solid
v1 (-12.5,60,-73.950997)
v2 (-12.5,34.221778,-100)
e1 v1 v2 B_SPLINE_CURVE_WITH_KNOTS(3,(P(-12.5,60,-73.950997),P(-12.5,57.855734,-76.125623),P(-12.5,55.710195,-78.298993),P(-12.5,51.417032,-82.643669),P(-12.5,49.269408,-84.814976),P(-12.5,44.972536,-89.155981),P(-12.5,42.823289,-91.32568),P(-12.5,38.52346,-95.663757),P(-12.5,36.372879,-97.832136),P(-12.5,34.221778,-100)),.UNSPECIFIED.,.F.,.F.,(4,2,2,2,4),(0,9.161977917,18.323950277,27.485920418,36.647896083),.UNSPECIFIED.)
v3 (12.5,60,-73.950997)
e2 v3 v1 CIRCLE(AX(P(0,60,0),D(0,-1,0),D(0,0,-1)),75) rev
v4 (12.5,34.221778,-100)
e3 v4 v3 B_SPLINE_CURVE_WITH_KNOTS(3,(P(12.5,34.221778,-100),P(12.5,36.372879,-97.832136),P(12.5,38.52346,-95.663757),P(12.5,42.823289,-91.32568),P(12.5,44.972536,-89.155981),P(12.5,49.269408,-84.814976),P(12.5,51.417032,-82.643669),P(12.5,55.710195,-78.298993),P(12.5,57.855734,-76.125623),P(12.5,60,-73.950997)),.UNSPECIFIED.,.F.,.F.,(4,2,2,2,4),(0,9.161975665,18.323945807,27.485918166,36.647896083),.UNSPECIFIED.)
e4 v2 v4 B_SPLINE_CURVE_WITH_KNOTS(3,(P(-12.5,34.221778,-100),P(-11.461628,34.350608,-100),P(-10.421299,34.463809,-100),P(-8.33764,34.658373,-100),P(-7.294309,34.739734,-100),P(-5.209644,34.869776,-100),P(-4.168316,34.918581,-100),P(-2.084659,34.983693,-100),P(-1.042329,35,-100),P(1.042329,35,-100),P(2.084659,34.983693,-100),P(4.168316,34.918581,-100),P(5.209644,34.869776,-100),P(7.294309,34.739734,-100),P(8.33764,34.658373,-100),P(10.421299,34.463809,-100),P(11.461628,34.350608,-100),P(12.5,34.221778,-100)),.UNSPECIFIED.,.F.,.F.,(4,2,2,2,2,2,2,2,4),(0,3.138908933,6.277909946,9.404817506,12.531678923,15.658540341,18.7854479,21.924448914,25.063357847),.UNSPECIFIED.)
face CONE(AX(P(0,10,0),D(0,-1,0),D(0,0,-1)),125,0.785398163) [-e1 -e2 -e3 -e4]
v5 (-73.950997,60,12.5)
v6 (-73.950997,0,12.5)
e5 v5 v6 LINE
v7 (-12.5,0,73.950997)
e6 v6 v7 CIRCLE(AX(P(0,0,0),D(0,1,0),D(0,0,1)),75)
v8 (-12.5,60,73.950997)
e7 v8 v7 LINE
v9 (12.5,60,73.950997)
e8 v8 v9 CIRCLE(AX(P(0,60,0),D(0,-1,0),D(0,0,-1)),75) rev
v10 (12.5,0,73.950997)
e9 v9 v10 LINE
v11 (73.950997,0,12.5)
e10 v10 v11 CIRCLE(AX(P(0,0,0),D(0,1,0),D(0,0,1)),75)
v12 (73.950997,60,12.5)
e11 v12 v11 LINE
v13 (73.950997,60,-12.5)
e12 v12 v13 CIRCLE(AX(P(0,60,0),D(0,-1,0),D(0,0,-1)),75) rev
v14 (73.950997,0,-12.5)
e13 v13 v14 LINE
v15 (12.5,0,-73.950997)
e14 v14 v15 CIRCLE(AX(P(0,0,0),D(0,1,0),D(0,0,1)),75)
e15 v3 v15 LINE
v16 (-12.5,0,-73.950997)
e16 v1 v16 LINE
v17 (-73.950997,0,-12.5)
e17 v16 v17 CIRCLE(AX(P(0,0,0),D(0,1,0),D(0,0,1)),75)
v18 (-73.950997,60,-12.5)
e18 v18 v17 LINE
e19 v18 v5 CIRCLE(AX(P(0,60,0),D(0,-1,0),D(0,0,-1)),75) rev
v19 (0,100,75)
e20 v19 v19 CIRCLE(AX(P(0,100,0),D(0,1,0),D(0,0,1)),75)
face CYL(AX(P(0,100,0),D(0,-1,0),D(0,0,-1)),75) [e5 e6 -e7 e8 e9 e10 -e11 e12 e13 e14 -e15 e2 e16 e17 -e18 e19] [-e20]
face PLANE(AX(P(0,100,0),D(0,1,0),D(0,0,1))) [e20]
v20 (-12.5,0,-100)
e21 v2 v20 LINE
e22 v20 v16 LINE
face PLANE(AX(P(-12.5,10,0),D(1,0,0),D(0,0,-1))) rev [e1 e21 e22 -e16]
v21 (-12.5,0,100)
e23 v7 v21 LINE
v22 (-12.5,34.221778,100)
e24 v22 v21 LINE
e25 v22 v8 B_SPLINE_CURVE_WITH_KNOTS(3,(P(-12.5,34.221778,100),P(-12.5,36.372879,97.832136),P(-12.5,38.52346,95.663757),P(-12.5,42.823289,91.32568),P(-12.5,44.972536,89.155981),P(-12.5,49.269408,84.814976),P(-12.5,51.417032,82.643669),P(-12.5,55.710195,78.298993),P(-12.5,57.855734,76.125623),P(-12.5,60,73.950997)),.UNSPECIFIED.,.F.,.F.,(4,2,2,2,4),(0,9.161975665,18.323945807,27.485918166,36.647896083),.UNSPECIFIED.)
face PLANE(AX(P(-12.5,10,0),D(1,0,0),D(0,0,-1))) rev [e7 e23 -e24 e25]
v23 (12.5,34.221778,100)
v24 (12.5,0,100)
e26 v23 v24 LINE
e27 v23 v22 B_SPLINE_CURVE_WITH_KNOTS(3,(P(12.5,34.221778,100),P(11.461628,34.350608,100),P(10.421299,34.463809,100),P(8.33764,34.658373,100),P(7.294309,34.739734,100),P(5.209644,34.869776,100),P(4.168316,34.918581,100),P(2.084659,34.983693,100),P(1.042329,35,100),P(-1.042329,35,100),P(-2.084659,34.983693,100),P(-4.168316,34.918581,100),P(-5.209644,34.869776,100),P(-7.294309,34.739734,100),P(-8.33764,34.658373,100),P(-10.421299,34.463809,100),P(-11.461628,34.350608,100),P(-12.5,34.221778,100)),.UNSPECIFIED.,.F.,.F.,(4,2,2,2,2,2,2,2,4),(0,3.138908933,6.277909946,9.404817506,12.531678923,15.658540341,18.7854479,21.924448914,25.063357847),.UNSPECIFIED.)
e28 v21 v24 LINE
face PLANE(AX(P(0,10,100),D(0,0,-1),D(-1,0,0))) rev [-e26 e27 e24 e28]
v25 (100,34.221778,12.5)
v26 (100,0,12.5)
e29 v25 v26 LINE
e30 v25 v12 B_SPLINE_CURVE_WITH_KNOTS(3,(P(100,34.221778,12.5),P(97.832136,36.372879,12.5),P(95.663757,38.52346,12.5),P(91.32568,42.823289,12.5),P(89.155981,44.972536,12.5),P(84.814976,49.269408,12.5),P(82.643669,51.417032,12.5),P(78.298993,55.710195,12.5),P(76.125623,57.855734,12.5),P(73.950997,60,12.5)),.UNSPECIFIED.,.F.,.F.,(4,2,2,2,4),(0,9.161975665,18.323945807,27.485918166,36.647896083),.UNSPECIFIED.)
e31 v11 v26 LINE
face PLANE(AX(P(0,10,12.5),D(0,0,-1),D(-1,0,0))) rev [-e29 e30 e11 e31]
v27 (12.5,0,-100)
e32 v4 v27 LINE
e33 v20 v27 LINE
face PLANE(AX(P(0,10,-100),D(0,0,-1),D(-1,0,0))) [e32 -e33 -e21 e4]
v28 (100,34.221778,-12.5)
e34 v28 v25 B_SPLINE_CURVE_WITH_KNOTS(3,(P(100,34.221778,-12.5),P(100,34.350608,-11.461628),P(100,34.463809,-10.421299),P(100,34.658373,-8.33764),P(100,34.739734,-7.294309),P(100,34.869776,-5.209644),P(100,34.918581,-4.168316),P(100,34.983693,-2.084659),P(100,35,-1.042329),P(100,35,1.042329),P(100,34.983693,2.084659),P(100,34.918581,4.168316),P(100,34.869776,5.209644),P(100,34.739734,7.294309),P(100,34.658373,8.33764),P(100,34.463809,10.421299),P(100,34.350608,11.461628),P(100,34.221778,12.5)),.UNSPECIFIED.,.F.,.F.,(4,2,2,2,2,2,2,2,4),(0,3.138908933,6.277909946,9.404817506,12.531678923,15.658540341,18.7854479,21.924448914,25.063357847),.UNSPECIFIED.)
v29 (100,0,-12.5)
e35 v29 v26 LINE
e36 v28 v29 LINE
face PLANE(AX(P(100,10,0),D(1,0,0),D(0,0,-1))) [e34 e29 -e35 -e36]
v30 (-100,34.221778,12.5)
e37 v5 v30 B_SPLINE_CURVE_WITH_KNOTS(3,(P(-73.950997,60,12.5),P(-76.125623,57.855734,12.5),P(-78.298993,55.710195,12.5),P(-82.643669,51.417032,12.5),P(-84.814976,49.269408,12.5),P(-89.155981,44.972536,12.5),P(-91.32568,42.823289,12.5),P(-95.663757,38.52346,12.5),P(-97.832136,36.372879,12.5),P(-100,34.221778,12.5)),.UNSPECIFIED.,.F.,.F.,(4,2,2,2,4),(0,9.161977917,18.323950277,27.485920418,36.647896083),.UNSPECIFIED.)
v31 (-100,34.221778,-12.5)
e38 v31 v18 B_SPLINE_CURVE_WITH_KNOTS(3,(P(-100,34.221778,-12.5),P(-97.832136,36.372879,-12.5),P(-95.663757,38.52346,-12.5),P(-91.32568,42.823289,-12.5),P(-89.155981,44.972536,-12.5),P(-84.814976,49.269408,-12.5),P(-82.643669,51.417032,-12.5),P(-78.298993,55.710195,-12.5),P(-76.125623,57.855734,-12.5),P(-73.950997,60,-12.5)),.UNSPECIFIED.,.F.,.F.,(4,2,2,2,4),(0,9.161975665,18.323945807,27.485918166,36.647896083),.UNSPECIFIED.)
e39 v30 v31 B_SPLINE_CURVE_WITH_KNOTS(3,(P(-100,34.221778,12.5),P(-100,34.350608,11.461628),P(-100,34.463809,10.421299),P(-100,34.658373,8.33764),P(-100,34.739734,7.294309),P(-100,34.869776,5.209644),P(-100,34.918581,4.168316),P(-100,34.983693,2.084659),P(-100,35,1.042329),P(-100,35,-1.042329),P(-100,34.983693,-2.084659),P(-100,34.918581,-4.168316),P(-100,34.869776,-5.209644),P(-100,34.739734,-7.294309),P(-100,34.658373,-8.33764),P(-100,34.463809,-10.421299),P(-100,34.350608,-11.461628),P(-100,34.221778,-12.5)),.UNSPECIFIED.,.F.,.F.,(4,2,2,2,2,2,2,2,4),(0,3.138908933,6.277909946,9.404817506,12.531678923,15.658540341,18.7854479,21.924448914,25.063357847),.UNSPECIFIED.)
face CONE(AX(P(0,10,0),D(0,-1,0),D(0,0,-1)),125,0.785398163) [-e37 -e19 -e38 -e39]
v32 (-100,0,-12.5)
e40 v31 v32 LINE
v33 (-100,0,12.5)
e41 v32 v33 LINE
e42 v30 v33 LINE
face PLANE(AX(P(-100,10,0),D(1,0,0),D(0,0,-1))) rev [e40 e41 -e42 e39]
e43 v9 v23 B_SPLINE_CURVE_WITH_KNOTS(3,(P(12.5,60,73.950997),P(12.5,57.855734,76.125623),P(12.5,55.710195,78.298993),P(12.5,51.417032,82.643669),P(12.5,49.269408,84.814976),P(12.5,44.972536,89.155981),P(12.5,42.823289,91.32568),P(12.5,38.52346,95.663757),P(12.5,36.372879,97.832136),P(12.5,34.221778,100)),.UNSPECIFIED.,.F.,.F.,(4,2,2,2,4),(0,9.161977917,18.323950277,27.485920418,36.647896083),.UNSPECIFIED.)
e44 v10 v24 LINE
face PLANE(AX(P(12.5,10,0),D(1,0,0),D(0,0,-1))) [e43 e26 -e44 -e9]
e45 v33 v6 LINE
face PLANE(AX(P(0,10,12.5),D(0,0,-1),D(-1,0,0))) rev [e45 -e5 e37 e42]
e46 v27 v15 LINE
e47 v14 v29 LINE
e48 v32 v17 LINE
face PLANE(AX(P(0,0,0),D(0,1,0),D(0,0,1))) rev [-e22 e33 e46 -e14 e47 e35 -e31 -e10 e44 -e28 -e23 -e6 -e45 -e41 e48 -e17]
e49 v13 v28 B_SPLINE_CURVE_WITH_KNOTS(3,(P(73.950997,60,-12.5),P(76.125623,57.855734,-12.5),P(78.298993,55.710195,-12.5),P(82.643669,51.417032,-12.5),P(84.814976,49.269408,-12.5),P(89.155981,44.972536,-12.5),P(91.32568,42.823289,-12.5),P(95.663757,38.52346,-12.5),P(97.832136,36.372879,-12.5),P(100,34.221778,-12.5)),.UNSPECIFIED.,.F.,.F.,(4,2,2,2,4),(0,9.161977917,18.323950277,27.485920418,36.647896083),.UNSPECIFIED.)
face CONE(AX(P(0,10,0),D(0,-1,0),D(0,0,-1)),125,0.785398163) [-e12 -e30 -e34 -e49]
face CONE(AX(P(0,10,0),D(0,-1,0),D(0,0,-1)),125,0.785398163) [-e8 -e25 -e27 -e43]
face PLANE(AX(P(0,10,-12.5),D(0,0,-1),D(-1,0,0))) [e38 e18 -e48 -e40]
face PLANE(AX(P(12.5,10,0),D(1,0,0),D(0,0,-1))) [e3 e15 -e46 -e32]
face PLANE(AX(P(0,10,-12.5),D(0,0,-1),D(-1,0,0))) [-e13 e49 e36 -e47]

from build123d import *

# Parameters (mm, degrees)
SKETCH1_R           = 75
BOSS_EXTRUDE1_DEPTH = 100
BOSS_EXTRUDE2_DEPTH = 10
CHAMFER1_SIZE       = 50


with BuildPart() as part:
    # Sketch1 → Boss-Extrude1 (new body)
    with BuildSketch(Plane(origin=(0, 0, 0), x_dir=(1, 0, 0), z_dir=(0, 1, 0))):
        with Locations(Location((0, 0, 0), (0, 0, 270))):
            Circle(SKETCH1_R)
    extrude(amount=BOSS_EXTRUDE1_DEPTH)

    # Sketch2 → Boss-Extrude2 (add)
    with BuildSketch(Plane.XZ):
        with BuildLine():
            Line((-100, 12.5), (-100, -12.5))
            Line((-100, -12.5), (-73.950997289, -12.5))
            ThreePointArc((-73.950997289, -12.5), (-75, 0), (-73.950997289, 12.5))
            Line((-73.950997289, 12.5), (-100, 12.5))
        make_face()
        with BuildLine():
            ThreePointArc((75, 0), (74.737289209, -6.271969521), (73.950997289, -12.5))
            Line((73.950997289, -12.5), (100, -12.5))
            Line((100, -12.5), (100, 12.5))
            Line((100, 12.5), (73.950997289, 12.5))
            ThreePointArc((73.950997289, 12.5), (74.737289209, 6.271969521), (75, 0))
        make_face()
        with BuildLine():
            Line((-12.5, 100), (-12.5, 73.950997289))
            ThreePointArc((-12.5, 73.950997289), (0, 75), (12.5, 73.950997289))
            Line((12.5, 73.950997289), (12.5, 100))
            Line((12.5, 100), (-12.5, 100))
        make_face()
        with BuildLine():
            ThreePointArc((12.5, -73.950997289), (0, -75), (-12.5, -73.950997289))
            Line((-12.5, -73.950997289), (-12.5, -100))
            Line((-12.5, -100), (12.5, -100))
            Line((12.5, -100), (12.5, -73.950997289))
        make_face()
    extrude(amount=-BOSS_EXTRUDE2_DEPTH)

    # Chamfer1
    # the kernel refuses this chamfer: 50 mm, written as the material it adds along each edge
    with BuildSketch(Plane(origin=(0, 10, 0), x_dir=(0.9519856818942184, 0, 0.30614255089484044), z_dir=(-0.30614255089484044, 0, 0.9519856818942184))) as chamfer1_piece_1_section:
        Polygon((75, CHAMFER1_SIZE), (75 + CHAMFER1_SIZE, 0), (75, 0), align=None)
    chamfer1_piece_1 = revolve(axis=Axis((0, 10, 0), (0, 1, 0)), revolution_arc=215.653831418, mode=Mode.PRIVATE)
    chamfer1_piece_1 = split(chamfer1_piece_1, bisect_by=Plane(origin=(-12.5, 29.622120316, 1e-09), z_dir=(1, 0, 0)), keep=Keep.TOP, mode=Mode.PRIVATE)
    chamfer1_piece_1 = split(chamfer1_piece_1, bisect_by=Plane(origin=(85.193298793, 29.622120316, 12.5), z_dir=(0, 0, -1)), keep=Keep.TOP, mode=Mode.PRIVATE)
    chamfer1_piece_1 = split(chamfer1_piece_1, bisect_by=Plane(origin=(85.193298793, 29.622120316, -12.5), z_dir=(0, 0, 1)), keep=Keep.TOP, mode=Mode.PRIVATE)
    chamfer1_piece_1 = split(chamfer1_piece_1, bisect_by=Plane(origin=(100, 29.622120316, 1e-09), z_dir=(-1, 0, 0)), keep=Keep.TOP, mode=Mode.PRIVATE)
    add(chamfer1_piece_1)
    with BuildSketch(Plane(origin=(0, 10, 0), x_dir=(0.9519856818942184, 0, 0.30614255089484044), z_dir=(-0.30614255089484044, 0, 0.9519856818942184))) as chamfer1_piece_2_section:
        Polygon((75, CHAMFER1_SIZE), (75 + CHAMFER1_SIZE, 0), (75, 0), align=None)
    chamfer1_piece_2 = revolve(axis=Axis((0, 10, 0), (0, 1, 0)), revolution_arc=215.653831418, mode=Mode.PRIVATE)
    chamfer1_piece_2 = split(chamfer1_piece_2, bisect_by=Plane(origin=(12.5, 29.62212033, -85.19329881), z_dir=(-1, 0, 0)), keep=Keep.TOP, mode=Mode.PRIVATE)
    chamfer1_piece_2 = split(chamfer1_piece_2, bisect_by=Plane(origin=(-12.5, 29.62212033, -85.19329881), z_dir=(1, 0, 0)), keep=Keep.TOP, mode=Mode.PRIVATE)
    chamfer1_piece_2 = split(chamfer1_piece_2, bisect_by=Plane(origin=(0, 29.62212033, -100), z_dir=(0, 0, 1)), keep=Keep.TOP, mode=Mode.PRIVATE)
    add(chamfer1_piece_2)
    with BuildSketch(Plane(origin=(0, 10, 0), x_dir=(0.9519856818942184, 0, 0.30614255089484044), z_dir=(-0.30614255089484044, 0, 0.9519856818942184))) as chamfer1_piece_3_section:
        Polygon((75, CHAMFER1_SIZE), (75 + CHAMFER1_SIZE, 0), (75, 0), align=None)
    chamfer1_piece_3 = revolve(axis=Axis((0, 10, 0), (0, 1, 0)), revolution_arc=215.653831418, mode=Mode.PRIVATE)
    chamfer1_piece_3 = split(chamfer1_piece_3, bisect_by=Plane(origin=(-12.5, 29.622120318, 1e-09), z_dir=(-1, 0, 0)), keep=Keep.TOP, mode=Mode.PRIVATE)
    chamfer1_piece_3 = split(chamfer1_piece_3, bisect_by=Plane(origin=(-85.193298793, 29.622120318, 12.5), z_dir=(0, 0, -1)), keep=Keep.TOP, mode=Mode.PRIVATE)
    chamfer1_piece_3 = split(chamfer1_piece_3, bisect_by=Plane(origin=(-85.193298793, 29.622120318, -12.5), z_dir=(0, 0, 1)), keep=Keep.TOP, mode=Mode.PRIVATE)
    chamfer1_piece_3 = split(chamfer1_piece_3, bisect_by=Plane(origin=(-100, 29.622120318, 1e-09), z_dir=(1, 0, 0)), keep=Keep.TOP, mode=Mode.PRIVATE)
    add(chamfer1_piece_3)
    with BuildSketch(Plane(origin=(0, 10, 0), x_dir=(-0.30614255089485254, 0, 0.9519856818942145), z_dir=(-0.9519856818942145, 0, -0.30614255089485254))) as chamfer1_piece_4_section:
        Polygon((75, CHAMFER1_SIZE), (75 + CHAMFER1_SIZE, 0), (75, 0), align=None)
    chamfer1_piece_4 = revolve(axis=Axis((0, 10, 0), (0, 1, 0)), revolution_arc=215.653831418, mode=Mode.PRIVATE)
    chamfer1_piece_4 = split(chamfer1_piece_4, bisect_by=Plane(origin=(-1e-09, 29.622120316, -12.5), z_dir=(0, 0, 1)), keep=Keep.TOP, mode=Mode.PRIVATE)
    chamfer1_piece_4 = split(chamfer1_piece_4, bisect_by=Plane(origin=(12.5, 29.622120316, 85.193298793), z_dir=(-1, 0, 0)), keep=Keep.TOP, mode=Mode.PRIVATE)
    chamfer1_piece_4 = split(chamfer1_piece_4, bisect_by=Plane(origin=(-1e-09, 29.622120316, 100), z_dir=(0, 0, -1)), keep=Keep.TOP, mode=Mode.PRIVATE)
    chamfer1_piece_4 = split(chamfer1_piece_4, bisect_by=Plane(origin=(-12.5, 29.622120316, 85.193298793), z_dir=(1, 0, 0)), keep=Keep.TOP, mode=Mode.PRIVATE)
    add(chamfer1_piece_4)
    with BuildSketch(Plane(origin=(0, 10, 0), x_dir=(-0.30614255089485254, 0, 0.9519856818942145), z_dir=(-0.9519856818942145, 0, -0.30614255089485254))) as chamfer1_piece_5_section:
        Polygon((75, CHAMFER1_SIZE), (75 + CHAMFER1_SIZE, 0), (75, 0), align=None)
    chamfer1_piece_5 = revolve(axis=Axis((0, 10, 0), (0, 1, 0)), revolution_arc=215.653831418, mode=Mode.PRIVATE)
    chamfer1_piece_5 = split(chamfer1_piece_5, bisect_by=Plane(origin=(85.19329881, 29.62212033, 12.5), z_dir=(0, 0, -1)), keep=Keep.TOP, mode=Mode.PRIVATE)
    chamfer1_piece_5 = split(chamfer1_piece_5, bisect_by=Plane(origin=(85.19329881, 29.62212033, -12.5), z_dir=(0, 0, 1)), keep=Keep.TOP, mode=Mode.PRIVATE)
    chamfer1_piece_5 = split(chamfer1_piece_5, bisect_by=Plane(origin=(100, 29.62212033, 0), z_dir=(-1, 0, 0)), keep=Keep.TOP, mode=Mode.PRIVATE)
    add(chamfer1_piece_5)
    with BuildSketch(Plane(origin=(0, 10, 0), x_dir=(-0.30614255089485254, 0, 0.9519856818942145), z_dir=(-0.9519856818942145, 0, -0.30614255089485254))) as chamfer1_piece_6_section:
        Polygon((75, CHAMFER1_SIZE), (75 + CHAMFER1_SIZE, 0), (75, 0), align=None)
    chamfer1_piece_6 = revolve(axis=Axis((0, 10, 0), (0, 1, 0)), revolution_arc=215.653831418, mode=Mode.PRIVATE)
    chamfer1_piece_6 = split(chamfer1_piece_6, bisect_by=Plane(origin=(-1e-09, 29.622120318, -12.5), z_dir=(0, 0, -1)), keep=Keep.TOP, mode=Mode.PRIVATE)
    chamfer1_piece_6 = split(chamfer1_piece_6, bisect_by=Plane(origin=(12.5, 29.622120318, -85.193298793), z_dir=(-1, 0, 0)), keep=Keep.TOP, mode=Mode.PRIVATE)
    chamfer1_piece_6 = split(chamfer1_piece_6, bisect_by=Plane(origin=(-12.5, 29.622120318, -85.193298793), z_dir=(1, 0, 0)), keep=Keep.TOP, mode=Mode.PRIVATE)
    chamfer1_piece_6 = split(chamfer1_piece_6, bisect_by=Plane(origin=(-1e-09, 29.622120318, -100), z_dir=(0, 0, 1)), keep=Keep.TOP, mode=Mode.PRIVATE)
    add(chamfer1_piece_6)
    with BuildSketch(Plane(origin=(0, 10, 0), x_dir=(-0.9519928676316486, 0, -0.3061202051130742), z_dir=(0.3061202051130742, 0, -0.9519928676316486))) as chamfer1_piece_7_section:
        Polygon((75, CHAMFER1_SIZE), (75 + CHAMFER1_SIZE, 0), (75, 0), align=None)
    chamfer1_piece_7 = revolve(axis=Axis((0, 10, 0), (0, 1, 0)), revolution_arc=107.825570821, mode=Mode.PRIVATE)
    chamfer1_piece_7 = split(chamfer1_piece_7, bisect_by=Plane(origin=(-85.193298794, 29.622120316, -12.5), z_dir=(0, 0, 1)), keep=Keep.TOP, mode=Mode.PRIVATE)
    chamfer1_piece_7 = split(chamfer1_piece_7, bisect_by=Plane(origin=(-85.193298794, 29.622120316, 12.5), z_dir=(0, 0, -1)), keep=Keep.TOP, mode=Mode.PRIVATE)
    chamfer1_piece_7 = split(chamfer1_piece_7, bisect_by=Plane(origin=(-100, 29.622120316, -1e-09), z_dir=(1, 0, 0)), keep=Keep.TOP, mode=Mode.PRIVATE)
    add(chamfer1_piece_7)
    with BuildSketch(Plane(origin=(0, 10, 0), x_dir=(-0.9519928676316486, 0, -0.3061202051130742), z_dir=(0.3061202051130742, 0, -0.9519928676316486))) as chamfer1_piece_8_section:
        Polygon((75, CHAMFER1_SIZE), (75 + CHAMFER1_SIZE, 0), (75, 0), align=None)
    chamfer1_piece_8 = revolve(axis=Axis((0, 10, 0), (0, 1, 0)), revolution_arc=107.825570821, mode=Mode.PRIVATE)
    chamfer1_piece_8 = split(chamfer1_piece_8, bisect_by=Plane(origin=(-12.5, 29.622120326, 85.193298813), z_dir=(1, 0, 0)), keep=Keep.TOP, mode=Mode.PRIVATE)
    chamfer1_piece_8 = split(chamfer1_piece_8, bisect_by=Plane(origin=(-6.281740257, 29.622120326, 100), z_dir=(0, 0, -1)), keep=Keep.TOP, mode=Mode.PRIVATE)
    add(chamfer1_piece_8)
    with BuildSketch(Plane(origin=(0, 10, 0), x_dir=(0.30614255089486275, 0, -0.9519856818942113), z_dir=(0.9519856818942113, 0, 0.30614255089486275))) as chamfer1_piece_9_section:
        Polygon((75, CHAMFER1_SIZE), (75 + CHAMFER1_SIZE, 0), (75, 0), align=None)
    chamfer1_piece_9 = revolve(axis=Axis((0, 10, 0), (0, 1, 0)), revolution_arc=215.653831418, mode=Mode.PRIVATE)
    chamfer1_piece_9 = split(chamfer1_piece_9, bisect_by=Plane(origin=(1e-09, 29.622120316, 12.5), z_dir=(0, 0, -1)), keep=Keep.TOP, mode=Mode.PRIVATE)
    chamfer1_piece_9 = split(chamfer1_piece_9, bisect_by=Plane(origin=(12.5, 29.622120316, -85.193298793), z_dir=(-1, 0, 0)), keep=Keep.TOP, mode=Mode.PRIVATE)
    chamfer1_piece_9 = split(chamfer1_piece_9, bisect_by=Plane(origin=(-12.5, 29.622120316, -85.193298793), z_dir=(1, 0, 0)), keep=Keep.TOP, mode=Mode.PRIVATE)
    chamfer1_piece_9 = split(chamfer1_piece_9, bisect_by=Plane(origin=(1e-09, 29.622120316, -100), z_dir=(0, 0, 1)), keep=Keep.TOP, mode=Mode.PRIVATE)
    add(chamfer1_piece_9)
    with BuildSketch(Plane(origin=(0, 10, 0), x_dir=(0.30614255089486275, 0, -0.9519856818942113), z_dir=(0.9519856818942113, 0, 0.30614255089486275))) as chamfer1_piece_10_section:
        Polygon((75, CHAMFER1_SIZE), (75 + CHAMFER1_SIZE, 0), (75, 0), align=None)
    chamfer1_piece_10 = revolve(axis=Axis((0, 10, 0), (0, 1, 0)), revolution_arc=215.653831418, mode=Mode.PRIVATE)
    chamfer1_piece_10 = split(chamfer1_piece_10, bisect_by=Plane(origin=(-85.19329881, 29.62212033, -12.5), z_dir=(0, 0, 1)), keep=Keep.TOP, mode=Mode.PRIVATE)
    chamfer1_piece_10 = split(chamfer1_piece_10, bisect_by=Plane(origin=(-85.19329881, 29.62212033, 12.5), z_dir=(0, 0, -1)), keep=Keep.TOP, mode=Mode.PRIVATE)
    chamfer1_piece_10 = split(chamfer1_piece_10, bisect_by=Plane(origin=(-100, 29.62212033, 0), z_dir=(1, 0, 0)), keep=Keep.TOP, mode=Mode.PRIVATE)
    add(chamfer1_piece_10)
    with BuildSketch(Plane(origin=(0, 10, 0), x_dir=(0.30614255089486275, 0, -0.9519856818942113), z_dir=(0.9519856818942113, 0, 0.30614255089486275))) as chamfer1_piece_11_section:
        Polygon((75, CHAMFER1_SIZE), (75 + CHAMFER1_SIZE, 0), (75, 0), align=None)
    chamfer1_piece_11 = revolve(axis=Axis((0, 10, 0), (0, 1, 0)), revolution_arc=215.653831418, mode=Mode.PRIVATE)
    chamfer1_piece_11 = split(chamfer1_piece_11, bisect_by=Plane(origin=(1e-09, 29.622120318, 12.5), z_dir=(0, 0, 1)), keep=Keep.TOP, mode=Mode.PRIVATE)
    chamfer1_piece_11 = split(chamfer1_piece_11, bisect_by=Plane(origin=(12.5, 29.622120318, 85.193298793), z_dir=(-1, 0, 0)), keep=Keep.TOP, mode=Mode.PRIVATE)
    chamfer1_piece_11 = split(chamfer1_piece_11, bisect_by=Plane(origin=(1e-09, 29.622120318, 100), z_dir=(0, 0, -1)), keep=Keep.TOP, mode=Mode.PRIVATE)
    chamfer1_piece_11 = split(chamfer1_piece_11, bisect_by=Plane(origin=(-12.5, 29.622120318, 85.193298793), z_dir=(1, 0, 0)), keep=Keep.TOP, mode=Mode.PRIVATE)
    add(chamfer1_piece_11)
    with BuildSketch(Plane(origin=(0, 10, 0), x_dir=(0, 0, 1), z_dir=(-1, 0, 0))) as chamfer1_piece_12_section:
        Polygon((75, CHAMFER1_SIZE), (75 + CHAMFER1_SIZE, 0), (75, 0), align=None)
    chamfer1_piece_12 = revolve(axis=Axis((0, 10, 0), (0, 1, 0)), revolution_arc=107.825570821, mode=Mode.PRIVATE)
    chamfer1_piece_12 = split(chamfer1_piece_12, bisect_by=Plane(origin=(12.5, 29.622120324, 85.193298814), z_dir=(-1, 0, 0)), keep=Keep.TOP, mode=Mode.PRIVATE)
    chamfer1_piece_12 = split(chamfer1_piece_12, bisect_by=Plane(origin=(6.281740257, 29.622120324, 100), z_dir=(0, 0, -1)), keep=Keep.TOP, mode=Mode.PRIVATE)
    add(chamfer1_piece_12)
    with BuildSketch(Plane(origin=(0, 10, 0), x_dir=(0, 0, 1), z_dir=(-1, 0, 0))) as chamfer1_piece_13_section:
        Polygon((75, CHAMFER1_SIZE), (75 + CHAMFER1_SIZE, 0), (75, 0), align=None)
    chamfer1_piece_13 = revolve(axis=Axis((0, 10, 0), (0, 1, 0)), revolution_arc=107.825570821, mode=Mode.PRIVATE)
    chamfer1_piece_13 = split(chamfer1_piece_13, bisect_by=Plane(origin=(85.193298792, 29.622120318, 12.5), z_dir=(0, 0, -1)), keep=Keep.TOP, mode=Mode.PRIVATE)
    chamfer1_piece_13 = split(chamfer1_piece_13, bisect_by=Plane(origin=(85.193298792, 29.622120318, -12.5), z_dir=(0, 0, 1)), keep=Keep.TOP, mode=Mode.PRIVATE)
    chamfer1_piece_13 = split(chamfer1_piece_13, bisect_by=Plane(origin=(100, 29.622120318, -1e-09), z_dir=(-1, 0, 0)), keep=Keep.TOP, mode=Mode.PRIVATE)
    add(chamfer1_piece_13)


solid = part.part
